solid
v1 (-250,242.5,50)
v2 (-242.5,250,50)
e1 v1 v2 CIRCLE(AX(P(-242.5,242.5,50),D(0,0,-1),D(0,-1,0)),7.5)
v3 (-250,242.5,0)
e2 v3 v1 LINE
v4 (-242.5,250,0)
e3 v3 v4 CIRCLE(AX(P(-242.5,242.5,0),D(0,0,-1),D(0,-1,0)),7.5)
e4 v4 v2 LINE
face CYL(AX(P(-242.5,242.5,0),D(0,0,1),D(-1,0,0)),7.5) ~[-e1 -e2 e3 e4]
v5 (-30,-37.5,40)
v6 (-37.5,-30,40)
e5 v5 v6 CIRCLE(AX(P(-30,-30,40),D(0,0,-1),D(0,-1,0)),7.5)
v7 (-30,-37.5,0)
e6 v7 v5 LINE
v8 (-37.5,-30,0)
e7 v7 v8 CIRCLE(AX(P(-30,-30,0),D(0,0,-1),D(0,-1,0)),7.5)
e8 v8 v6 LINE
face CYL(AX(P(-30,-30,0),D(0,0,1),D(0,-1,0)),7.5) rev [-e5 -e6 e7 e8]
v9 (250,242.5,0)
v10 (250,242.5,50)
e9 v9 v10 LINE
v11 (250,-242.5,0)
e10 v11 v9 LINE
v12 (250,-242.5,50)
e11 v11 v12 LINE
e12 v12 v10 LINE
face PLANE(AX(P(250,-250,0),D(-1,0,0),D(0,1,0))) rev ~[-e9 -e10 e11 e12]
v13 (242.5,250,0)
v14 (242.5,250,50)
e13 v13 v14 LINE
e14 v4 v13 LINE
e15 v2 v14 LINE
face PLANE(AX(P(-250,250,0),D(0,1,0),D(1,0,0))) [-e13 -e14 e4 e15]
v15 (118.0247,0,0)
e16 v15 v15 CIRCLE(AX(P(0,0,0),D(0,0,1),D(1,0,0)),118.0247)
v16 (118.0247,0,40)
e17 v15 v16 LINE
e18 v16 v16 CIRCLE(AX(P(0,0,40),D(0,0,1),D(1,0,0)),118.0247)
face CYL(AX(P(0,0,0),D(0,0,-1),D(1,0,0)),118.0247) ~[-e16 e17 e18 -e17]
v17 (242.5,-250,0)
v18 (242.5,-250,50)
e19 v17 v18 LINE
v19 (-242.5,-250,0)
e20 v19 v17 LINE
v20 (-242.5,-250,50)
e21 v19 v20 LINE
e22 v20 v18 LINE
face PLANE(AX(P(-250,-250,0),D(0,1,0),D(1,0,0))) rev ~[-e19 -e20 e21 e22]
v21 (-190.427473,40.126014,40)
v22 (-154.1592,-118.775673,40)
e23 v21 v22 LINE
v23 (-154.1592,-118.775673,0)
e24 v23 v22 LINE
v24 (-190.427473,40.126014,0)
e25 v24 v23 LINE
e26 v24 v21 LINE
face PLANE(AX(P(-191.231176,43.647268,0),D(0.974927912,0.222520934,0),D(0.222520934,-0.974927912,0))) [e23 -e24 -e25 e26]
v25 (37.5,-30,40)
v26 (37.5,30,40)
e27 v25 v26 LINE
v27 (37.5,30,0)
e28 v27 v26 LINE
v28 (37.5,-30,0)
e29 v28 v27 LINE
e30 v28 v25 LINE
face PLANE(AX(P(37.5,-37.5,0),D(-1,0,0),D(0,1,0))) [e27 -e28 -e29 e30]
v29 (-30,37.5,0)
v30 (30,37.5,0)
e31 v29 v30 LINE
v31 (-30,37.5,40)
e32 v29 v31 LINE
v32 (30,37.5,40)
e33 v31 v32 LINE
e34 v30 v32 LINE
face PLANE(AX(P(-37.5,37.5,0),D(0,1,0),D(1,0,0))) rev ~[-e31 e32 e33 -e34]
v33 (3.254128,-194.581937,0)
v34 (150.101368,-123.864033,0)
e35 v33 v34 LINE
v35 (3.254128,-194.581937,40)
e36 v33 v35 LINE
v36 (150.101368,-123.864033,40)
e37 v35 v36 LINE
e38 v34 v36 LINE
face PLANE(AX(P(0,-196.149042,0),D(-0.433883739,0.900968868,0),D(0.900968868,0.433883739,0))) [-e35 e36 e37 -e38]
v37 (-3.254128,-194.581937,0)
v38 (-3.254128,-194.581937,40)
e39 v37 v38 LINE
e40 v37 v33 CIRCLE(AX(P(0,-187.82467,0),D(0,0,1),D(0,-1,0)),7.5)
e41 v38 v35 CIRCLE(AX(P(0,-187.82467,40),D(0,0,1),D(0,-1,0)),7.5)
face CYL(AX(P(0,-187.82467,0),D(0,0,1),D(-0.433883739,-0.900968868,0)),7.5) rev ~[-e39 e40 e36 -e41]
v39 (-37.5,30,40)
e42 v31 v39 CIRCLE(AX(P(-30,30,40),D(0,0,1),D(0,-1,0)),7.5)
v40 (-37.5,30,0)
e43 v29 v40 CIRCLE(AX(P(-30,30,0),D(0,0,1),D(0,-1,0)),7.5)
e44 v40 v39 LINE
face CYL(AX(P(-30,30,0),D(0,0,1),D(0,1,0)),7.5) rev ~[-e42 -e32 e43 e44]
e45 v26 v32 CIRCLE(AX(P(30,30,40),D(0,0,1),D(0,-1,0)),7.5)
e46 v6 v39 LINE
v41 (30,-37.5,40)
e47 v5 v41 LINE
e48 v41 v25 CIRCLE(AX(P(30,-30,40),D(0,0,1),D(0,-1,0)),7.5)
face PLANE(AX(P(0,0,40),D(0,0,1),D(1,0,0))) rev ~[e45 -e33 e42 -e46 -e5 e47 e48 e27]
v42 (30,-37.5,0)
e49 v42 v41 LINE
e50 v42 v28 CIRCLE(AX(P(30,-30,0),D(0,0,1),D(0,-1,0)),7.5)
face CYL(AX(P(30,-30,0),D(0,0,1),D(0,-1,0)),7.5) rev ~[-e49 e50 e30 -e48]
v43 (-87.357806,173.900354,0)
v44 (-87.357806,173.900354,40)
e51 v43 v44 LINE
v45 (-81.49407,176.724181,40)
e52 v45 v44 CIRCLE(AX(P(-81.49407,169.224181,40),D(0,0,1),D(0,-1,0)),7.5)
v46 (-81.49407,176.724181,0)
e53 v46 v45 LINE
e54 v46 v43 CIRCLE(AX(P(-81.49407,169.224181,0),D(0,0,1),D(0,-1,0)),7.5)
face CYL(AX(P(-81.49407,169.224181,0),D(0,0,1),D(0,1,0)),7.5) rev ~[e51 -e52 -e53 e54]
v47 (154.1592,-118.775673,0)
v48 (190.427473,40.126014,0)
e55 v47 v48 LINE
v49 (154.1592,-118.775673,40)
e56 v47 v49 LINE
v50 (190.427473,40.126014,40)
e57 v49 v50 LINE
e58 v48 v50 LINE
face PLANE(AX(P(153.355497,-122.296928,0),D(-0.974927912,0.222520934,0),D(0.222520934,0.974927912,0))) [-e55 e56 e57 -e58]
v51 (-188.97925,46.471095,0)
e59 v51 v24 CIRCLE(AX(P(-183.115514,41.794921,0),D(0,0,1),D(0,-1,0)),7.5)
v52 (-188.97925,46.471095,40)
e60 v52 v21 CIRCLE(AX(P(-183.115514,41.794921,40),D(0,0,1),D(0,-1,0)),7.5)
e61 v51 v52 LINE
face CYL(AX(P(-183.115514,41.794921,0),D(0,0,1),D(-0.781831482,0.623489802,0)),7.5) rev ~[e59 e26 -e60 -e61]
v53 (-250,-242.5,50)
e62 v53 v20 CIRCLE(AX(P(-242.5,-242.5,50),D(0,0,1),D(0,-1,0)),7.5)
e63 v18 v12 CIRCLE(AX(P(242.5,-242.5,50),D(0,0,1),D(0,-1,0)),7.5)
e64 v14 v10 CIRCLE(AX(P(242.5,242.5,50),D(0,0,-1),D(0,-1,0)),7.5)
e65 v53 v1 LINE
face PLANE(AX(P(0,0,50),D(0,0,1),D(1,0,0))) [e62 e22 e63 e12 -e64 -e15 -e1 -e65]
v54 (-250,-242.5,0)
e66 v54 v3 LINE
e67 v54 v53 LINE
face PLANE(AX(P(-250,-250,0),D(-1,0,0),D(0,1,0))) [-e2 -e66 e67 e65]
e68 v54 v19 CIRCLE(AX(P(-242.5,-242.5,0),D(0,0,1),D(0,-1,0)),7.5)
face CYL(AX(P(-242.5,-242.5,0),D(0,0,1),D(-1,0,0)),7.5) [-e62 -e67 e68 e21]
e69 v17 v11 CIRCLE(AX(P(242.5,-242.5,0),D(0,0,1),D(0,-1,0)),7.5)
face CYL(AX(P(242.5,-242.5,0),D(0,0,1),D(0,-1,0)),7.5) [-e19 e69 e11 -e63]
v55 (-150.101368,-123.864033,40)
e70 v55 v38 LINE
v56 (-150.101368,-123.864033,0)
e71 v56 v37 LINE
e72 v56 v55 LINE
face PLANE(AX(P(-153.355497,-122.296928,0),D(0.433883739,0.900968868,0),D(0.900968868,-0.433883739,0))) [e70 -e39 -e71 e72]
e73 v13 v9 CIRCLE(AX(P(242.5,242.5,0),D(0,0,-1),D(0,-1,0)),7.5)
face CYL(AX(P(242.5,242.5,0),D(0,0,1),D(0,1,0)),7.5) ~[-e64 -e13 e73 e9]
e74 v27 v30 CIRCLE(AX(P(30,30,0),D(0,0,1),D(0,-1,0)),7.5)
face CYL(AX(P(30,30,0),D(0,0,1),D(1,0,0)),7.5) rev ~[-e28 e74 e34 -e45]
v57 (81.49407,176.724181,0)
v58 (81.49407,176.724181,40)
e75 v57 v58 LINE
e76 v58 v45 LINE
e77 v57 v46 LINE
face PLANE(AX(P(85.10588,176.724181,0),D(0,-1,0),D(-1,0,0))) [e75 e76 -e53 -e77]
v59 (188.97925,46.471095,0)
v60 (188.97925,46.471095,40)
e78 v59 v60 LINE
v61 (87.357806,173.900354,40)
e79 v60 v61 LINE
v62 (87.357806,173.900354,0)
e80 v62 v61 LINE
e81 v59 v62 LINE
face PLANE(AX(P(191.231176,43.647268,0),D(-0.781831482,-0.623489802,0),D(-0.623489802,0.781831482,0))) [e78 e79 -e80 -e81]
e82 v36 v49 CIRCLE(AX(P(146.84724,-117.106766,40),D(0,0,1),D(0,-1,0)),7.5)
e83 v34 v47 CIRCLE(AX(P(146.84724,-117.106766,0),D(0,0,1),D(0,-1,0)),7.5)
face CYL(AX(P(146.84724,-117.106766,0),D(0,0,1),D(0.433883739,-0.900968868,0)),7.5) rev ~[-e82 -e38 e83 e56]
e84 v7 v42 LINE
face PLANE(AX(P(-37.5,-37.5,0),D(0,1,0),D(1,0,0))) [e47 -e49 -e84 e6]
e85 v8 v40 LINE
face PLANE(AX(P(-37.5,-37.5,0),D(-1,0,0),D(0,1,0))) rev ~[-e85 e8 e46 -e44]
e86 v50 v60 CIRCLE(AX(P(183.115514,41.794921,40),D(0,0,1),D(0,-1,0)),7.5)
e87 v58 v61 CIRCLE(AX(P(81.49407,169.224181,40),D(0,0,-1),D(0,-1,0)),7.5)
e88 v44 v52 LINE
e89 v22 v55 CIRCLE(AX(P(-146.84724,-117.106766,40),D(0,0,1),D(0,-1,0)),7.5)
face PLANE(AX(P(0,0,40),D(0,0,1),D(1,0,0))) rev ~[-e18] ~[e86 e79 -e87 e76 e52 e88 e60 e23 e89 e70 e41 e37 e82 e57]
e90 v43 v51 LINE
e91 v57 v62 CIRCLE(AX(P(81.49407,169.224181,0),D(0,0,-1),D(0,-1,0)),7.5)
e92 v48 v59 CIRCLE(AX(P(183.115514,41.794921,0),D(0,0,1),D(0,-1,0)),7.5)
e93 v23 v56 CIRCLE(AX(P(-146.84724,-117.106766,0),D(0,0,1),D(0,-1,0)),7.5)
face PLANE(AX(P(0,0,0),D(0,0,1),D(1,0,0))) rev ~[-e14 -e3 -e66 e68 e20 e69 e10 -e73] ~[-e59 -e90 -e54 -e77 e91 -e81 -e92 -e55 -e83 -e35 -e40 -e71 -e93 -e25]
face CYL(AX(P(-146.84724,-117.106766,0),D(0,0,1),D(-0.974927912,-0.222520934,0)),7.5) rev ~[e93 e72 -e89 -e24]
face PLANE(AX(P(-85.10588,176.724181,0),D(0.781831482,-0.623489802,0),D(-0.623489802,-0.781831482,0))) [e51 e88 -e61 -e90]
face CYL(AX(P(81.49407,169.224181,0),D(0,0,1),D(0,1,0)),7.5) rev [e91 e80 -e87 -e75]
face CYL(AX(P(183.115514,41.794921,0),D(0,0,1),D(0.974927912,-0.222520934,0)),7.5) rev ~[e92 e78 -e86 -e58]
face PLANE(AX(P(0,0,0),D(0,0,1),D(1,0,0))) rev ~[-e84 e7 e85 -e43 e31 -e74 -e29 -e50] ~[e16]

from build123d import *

# Parameters (mm, degrees)
F0_W     = 500
F0_H     = 500
F0_R     = 118.0247003556
F0_W_2   = 75
F0_H_2   = 75
F1_DEPTH = 50
F2_DEPTH = 40
F3_R     = 7.5


with BuildPart() as f1:
    # F0 (on Top) → F1 (new body)
    with BuildSketch(Plane.XY):
        Rectangle(F0_W, F0_H)
        Polygon((-191.2311762839, 43.6472680867), (-85.1058798965, 176.7241805792), (85.1058798965, 176.7241805792), (191.2311762839, 43.6472680867), (153.3554965244, -122.296927517), (0, -196.1490422978), (-153.3554965244, -122.296927517), align=None, mode=Mode.SUBTRACT)
        Polygon((85.1058798965, 176.7241805792), (-85.1058798965, 176.7241805792), (-191.2311762839, 43.6472680867), (-153.3554965244, -122.296927517), (0, -196.1490422978), (153.3554965244, -122.296927517), (191.2311762839, 43.6472680867), align=None)
        Circle(F0_R, mode=Mode.SUBTRACT)
        Circle(F0_R)
        Rectangle(F0_W_2, F0_H_2, mode=Mode.SUBTRACT)
        Rectangle(F0_W_2, F0_H_2)
    extrude(amount=F1_DEPTH)

    # F0 (on Top) → F2 (cut)
    with BuildSketch(Plane.XY):
        Polygon((85.1058798965, 176.7241805792), (-85.1058798965, 176.7241805792), (-191.2311762839, 43.6472680867), (-153.3554965244, -122.296927517), (0, -196.1490422978), (153.3554965244, -122.296927517), (191.2311762839, 43.6472680867), align=None)
        Circle(F0_R, mode=Mode.SUBTRACT)
        Rectangle(F0_W_2, F0_H_2)
    extrude(amount=F2_DEPTH, mode=Mode.SUBTRACT)

    # F3
    f3_edges = [f1.edges().sort_by_distance(p)[0] for p in [
        (250, -250, 25),
        (-250, -250, 25),
        (-250, 250, 25),
        (250, 250, 25),
        (0, -196.149042, 20),
        (-153.355497, -122.296928, 20),
        (153.355497, -122.296928, 20),
        (191.231176, 43.647268, 20),
        (85.10588, 176.724181, 20),
        (-85.10588, 176.724181, 20),
        (-191.231176, 43.647268, 20),
        (-37.5, -37.5, 20),
        (37.5, -37.5, 20),
        (37.5, 37.5, 20),
        (-37.5, 37.5, 20),
    ]]
    fillet(f3_edges, radius=F3_R)


solid = f1.part
